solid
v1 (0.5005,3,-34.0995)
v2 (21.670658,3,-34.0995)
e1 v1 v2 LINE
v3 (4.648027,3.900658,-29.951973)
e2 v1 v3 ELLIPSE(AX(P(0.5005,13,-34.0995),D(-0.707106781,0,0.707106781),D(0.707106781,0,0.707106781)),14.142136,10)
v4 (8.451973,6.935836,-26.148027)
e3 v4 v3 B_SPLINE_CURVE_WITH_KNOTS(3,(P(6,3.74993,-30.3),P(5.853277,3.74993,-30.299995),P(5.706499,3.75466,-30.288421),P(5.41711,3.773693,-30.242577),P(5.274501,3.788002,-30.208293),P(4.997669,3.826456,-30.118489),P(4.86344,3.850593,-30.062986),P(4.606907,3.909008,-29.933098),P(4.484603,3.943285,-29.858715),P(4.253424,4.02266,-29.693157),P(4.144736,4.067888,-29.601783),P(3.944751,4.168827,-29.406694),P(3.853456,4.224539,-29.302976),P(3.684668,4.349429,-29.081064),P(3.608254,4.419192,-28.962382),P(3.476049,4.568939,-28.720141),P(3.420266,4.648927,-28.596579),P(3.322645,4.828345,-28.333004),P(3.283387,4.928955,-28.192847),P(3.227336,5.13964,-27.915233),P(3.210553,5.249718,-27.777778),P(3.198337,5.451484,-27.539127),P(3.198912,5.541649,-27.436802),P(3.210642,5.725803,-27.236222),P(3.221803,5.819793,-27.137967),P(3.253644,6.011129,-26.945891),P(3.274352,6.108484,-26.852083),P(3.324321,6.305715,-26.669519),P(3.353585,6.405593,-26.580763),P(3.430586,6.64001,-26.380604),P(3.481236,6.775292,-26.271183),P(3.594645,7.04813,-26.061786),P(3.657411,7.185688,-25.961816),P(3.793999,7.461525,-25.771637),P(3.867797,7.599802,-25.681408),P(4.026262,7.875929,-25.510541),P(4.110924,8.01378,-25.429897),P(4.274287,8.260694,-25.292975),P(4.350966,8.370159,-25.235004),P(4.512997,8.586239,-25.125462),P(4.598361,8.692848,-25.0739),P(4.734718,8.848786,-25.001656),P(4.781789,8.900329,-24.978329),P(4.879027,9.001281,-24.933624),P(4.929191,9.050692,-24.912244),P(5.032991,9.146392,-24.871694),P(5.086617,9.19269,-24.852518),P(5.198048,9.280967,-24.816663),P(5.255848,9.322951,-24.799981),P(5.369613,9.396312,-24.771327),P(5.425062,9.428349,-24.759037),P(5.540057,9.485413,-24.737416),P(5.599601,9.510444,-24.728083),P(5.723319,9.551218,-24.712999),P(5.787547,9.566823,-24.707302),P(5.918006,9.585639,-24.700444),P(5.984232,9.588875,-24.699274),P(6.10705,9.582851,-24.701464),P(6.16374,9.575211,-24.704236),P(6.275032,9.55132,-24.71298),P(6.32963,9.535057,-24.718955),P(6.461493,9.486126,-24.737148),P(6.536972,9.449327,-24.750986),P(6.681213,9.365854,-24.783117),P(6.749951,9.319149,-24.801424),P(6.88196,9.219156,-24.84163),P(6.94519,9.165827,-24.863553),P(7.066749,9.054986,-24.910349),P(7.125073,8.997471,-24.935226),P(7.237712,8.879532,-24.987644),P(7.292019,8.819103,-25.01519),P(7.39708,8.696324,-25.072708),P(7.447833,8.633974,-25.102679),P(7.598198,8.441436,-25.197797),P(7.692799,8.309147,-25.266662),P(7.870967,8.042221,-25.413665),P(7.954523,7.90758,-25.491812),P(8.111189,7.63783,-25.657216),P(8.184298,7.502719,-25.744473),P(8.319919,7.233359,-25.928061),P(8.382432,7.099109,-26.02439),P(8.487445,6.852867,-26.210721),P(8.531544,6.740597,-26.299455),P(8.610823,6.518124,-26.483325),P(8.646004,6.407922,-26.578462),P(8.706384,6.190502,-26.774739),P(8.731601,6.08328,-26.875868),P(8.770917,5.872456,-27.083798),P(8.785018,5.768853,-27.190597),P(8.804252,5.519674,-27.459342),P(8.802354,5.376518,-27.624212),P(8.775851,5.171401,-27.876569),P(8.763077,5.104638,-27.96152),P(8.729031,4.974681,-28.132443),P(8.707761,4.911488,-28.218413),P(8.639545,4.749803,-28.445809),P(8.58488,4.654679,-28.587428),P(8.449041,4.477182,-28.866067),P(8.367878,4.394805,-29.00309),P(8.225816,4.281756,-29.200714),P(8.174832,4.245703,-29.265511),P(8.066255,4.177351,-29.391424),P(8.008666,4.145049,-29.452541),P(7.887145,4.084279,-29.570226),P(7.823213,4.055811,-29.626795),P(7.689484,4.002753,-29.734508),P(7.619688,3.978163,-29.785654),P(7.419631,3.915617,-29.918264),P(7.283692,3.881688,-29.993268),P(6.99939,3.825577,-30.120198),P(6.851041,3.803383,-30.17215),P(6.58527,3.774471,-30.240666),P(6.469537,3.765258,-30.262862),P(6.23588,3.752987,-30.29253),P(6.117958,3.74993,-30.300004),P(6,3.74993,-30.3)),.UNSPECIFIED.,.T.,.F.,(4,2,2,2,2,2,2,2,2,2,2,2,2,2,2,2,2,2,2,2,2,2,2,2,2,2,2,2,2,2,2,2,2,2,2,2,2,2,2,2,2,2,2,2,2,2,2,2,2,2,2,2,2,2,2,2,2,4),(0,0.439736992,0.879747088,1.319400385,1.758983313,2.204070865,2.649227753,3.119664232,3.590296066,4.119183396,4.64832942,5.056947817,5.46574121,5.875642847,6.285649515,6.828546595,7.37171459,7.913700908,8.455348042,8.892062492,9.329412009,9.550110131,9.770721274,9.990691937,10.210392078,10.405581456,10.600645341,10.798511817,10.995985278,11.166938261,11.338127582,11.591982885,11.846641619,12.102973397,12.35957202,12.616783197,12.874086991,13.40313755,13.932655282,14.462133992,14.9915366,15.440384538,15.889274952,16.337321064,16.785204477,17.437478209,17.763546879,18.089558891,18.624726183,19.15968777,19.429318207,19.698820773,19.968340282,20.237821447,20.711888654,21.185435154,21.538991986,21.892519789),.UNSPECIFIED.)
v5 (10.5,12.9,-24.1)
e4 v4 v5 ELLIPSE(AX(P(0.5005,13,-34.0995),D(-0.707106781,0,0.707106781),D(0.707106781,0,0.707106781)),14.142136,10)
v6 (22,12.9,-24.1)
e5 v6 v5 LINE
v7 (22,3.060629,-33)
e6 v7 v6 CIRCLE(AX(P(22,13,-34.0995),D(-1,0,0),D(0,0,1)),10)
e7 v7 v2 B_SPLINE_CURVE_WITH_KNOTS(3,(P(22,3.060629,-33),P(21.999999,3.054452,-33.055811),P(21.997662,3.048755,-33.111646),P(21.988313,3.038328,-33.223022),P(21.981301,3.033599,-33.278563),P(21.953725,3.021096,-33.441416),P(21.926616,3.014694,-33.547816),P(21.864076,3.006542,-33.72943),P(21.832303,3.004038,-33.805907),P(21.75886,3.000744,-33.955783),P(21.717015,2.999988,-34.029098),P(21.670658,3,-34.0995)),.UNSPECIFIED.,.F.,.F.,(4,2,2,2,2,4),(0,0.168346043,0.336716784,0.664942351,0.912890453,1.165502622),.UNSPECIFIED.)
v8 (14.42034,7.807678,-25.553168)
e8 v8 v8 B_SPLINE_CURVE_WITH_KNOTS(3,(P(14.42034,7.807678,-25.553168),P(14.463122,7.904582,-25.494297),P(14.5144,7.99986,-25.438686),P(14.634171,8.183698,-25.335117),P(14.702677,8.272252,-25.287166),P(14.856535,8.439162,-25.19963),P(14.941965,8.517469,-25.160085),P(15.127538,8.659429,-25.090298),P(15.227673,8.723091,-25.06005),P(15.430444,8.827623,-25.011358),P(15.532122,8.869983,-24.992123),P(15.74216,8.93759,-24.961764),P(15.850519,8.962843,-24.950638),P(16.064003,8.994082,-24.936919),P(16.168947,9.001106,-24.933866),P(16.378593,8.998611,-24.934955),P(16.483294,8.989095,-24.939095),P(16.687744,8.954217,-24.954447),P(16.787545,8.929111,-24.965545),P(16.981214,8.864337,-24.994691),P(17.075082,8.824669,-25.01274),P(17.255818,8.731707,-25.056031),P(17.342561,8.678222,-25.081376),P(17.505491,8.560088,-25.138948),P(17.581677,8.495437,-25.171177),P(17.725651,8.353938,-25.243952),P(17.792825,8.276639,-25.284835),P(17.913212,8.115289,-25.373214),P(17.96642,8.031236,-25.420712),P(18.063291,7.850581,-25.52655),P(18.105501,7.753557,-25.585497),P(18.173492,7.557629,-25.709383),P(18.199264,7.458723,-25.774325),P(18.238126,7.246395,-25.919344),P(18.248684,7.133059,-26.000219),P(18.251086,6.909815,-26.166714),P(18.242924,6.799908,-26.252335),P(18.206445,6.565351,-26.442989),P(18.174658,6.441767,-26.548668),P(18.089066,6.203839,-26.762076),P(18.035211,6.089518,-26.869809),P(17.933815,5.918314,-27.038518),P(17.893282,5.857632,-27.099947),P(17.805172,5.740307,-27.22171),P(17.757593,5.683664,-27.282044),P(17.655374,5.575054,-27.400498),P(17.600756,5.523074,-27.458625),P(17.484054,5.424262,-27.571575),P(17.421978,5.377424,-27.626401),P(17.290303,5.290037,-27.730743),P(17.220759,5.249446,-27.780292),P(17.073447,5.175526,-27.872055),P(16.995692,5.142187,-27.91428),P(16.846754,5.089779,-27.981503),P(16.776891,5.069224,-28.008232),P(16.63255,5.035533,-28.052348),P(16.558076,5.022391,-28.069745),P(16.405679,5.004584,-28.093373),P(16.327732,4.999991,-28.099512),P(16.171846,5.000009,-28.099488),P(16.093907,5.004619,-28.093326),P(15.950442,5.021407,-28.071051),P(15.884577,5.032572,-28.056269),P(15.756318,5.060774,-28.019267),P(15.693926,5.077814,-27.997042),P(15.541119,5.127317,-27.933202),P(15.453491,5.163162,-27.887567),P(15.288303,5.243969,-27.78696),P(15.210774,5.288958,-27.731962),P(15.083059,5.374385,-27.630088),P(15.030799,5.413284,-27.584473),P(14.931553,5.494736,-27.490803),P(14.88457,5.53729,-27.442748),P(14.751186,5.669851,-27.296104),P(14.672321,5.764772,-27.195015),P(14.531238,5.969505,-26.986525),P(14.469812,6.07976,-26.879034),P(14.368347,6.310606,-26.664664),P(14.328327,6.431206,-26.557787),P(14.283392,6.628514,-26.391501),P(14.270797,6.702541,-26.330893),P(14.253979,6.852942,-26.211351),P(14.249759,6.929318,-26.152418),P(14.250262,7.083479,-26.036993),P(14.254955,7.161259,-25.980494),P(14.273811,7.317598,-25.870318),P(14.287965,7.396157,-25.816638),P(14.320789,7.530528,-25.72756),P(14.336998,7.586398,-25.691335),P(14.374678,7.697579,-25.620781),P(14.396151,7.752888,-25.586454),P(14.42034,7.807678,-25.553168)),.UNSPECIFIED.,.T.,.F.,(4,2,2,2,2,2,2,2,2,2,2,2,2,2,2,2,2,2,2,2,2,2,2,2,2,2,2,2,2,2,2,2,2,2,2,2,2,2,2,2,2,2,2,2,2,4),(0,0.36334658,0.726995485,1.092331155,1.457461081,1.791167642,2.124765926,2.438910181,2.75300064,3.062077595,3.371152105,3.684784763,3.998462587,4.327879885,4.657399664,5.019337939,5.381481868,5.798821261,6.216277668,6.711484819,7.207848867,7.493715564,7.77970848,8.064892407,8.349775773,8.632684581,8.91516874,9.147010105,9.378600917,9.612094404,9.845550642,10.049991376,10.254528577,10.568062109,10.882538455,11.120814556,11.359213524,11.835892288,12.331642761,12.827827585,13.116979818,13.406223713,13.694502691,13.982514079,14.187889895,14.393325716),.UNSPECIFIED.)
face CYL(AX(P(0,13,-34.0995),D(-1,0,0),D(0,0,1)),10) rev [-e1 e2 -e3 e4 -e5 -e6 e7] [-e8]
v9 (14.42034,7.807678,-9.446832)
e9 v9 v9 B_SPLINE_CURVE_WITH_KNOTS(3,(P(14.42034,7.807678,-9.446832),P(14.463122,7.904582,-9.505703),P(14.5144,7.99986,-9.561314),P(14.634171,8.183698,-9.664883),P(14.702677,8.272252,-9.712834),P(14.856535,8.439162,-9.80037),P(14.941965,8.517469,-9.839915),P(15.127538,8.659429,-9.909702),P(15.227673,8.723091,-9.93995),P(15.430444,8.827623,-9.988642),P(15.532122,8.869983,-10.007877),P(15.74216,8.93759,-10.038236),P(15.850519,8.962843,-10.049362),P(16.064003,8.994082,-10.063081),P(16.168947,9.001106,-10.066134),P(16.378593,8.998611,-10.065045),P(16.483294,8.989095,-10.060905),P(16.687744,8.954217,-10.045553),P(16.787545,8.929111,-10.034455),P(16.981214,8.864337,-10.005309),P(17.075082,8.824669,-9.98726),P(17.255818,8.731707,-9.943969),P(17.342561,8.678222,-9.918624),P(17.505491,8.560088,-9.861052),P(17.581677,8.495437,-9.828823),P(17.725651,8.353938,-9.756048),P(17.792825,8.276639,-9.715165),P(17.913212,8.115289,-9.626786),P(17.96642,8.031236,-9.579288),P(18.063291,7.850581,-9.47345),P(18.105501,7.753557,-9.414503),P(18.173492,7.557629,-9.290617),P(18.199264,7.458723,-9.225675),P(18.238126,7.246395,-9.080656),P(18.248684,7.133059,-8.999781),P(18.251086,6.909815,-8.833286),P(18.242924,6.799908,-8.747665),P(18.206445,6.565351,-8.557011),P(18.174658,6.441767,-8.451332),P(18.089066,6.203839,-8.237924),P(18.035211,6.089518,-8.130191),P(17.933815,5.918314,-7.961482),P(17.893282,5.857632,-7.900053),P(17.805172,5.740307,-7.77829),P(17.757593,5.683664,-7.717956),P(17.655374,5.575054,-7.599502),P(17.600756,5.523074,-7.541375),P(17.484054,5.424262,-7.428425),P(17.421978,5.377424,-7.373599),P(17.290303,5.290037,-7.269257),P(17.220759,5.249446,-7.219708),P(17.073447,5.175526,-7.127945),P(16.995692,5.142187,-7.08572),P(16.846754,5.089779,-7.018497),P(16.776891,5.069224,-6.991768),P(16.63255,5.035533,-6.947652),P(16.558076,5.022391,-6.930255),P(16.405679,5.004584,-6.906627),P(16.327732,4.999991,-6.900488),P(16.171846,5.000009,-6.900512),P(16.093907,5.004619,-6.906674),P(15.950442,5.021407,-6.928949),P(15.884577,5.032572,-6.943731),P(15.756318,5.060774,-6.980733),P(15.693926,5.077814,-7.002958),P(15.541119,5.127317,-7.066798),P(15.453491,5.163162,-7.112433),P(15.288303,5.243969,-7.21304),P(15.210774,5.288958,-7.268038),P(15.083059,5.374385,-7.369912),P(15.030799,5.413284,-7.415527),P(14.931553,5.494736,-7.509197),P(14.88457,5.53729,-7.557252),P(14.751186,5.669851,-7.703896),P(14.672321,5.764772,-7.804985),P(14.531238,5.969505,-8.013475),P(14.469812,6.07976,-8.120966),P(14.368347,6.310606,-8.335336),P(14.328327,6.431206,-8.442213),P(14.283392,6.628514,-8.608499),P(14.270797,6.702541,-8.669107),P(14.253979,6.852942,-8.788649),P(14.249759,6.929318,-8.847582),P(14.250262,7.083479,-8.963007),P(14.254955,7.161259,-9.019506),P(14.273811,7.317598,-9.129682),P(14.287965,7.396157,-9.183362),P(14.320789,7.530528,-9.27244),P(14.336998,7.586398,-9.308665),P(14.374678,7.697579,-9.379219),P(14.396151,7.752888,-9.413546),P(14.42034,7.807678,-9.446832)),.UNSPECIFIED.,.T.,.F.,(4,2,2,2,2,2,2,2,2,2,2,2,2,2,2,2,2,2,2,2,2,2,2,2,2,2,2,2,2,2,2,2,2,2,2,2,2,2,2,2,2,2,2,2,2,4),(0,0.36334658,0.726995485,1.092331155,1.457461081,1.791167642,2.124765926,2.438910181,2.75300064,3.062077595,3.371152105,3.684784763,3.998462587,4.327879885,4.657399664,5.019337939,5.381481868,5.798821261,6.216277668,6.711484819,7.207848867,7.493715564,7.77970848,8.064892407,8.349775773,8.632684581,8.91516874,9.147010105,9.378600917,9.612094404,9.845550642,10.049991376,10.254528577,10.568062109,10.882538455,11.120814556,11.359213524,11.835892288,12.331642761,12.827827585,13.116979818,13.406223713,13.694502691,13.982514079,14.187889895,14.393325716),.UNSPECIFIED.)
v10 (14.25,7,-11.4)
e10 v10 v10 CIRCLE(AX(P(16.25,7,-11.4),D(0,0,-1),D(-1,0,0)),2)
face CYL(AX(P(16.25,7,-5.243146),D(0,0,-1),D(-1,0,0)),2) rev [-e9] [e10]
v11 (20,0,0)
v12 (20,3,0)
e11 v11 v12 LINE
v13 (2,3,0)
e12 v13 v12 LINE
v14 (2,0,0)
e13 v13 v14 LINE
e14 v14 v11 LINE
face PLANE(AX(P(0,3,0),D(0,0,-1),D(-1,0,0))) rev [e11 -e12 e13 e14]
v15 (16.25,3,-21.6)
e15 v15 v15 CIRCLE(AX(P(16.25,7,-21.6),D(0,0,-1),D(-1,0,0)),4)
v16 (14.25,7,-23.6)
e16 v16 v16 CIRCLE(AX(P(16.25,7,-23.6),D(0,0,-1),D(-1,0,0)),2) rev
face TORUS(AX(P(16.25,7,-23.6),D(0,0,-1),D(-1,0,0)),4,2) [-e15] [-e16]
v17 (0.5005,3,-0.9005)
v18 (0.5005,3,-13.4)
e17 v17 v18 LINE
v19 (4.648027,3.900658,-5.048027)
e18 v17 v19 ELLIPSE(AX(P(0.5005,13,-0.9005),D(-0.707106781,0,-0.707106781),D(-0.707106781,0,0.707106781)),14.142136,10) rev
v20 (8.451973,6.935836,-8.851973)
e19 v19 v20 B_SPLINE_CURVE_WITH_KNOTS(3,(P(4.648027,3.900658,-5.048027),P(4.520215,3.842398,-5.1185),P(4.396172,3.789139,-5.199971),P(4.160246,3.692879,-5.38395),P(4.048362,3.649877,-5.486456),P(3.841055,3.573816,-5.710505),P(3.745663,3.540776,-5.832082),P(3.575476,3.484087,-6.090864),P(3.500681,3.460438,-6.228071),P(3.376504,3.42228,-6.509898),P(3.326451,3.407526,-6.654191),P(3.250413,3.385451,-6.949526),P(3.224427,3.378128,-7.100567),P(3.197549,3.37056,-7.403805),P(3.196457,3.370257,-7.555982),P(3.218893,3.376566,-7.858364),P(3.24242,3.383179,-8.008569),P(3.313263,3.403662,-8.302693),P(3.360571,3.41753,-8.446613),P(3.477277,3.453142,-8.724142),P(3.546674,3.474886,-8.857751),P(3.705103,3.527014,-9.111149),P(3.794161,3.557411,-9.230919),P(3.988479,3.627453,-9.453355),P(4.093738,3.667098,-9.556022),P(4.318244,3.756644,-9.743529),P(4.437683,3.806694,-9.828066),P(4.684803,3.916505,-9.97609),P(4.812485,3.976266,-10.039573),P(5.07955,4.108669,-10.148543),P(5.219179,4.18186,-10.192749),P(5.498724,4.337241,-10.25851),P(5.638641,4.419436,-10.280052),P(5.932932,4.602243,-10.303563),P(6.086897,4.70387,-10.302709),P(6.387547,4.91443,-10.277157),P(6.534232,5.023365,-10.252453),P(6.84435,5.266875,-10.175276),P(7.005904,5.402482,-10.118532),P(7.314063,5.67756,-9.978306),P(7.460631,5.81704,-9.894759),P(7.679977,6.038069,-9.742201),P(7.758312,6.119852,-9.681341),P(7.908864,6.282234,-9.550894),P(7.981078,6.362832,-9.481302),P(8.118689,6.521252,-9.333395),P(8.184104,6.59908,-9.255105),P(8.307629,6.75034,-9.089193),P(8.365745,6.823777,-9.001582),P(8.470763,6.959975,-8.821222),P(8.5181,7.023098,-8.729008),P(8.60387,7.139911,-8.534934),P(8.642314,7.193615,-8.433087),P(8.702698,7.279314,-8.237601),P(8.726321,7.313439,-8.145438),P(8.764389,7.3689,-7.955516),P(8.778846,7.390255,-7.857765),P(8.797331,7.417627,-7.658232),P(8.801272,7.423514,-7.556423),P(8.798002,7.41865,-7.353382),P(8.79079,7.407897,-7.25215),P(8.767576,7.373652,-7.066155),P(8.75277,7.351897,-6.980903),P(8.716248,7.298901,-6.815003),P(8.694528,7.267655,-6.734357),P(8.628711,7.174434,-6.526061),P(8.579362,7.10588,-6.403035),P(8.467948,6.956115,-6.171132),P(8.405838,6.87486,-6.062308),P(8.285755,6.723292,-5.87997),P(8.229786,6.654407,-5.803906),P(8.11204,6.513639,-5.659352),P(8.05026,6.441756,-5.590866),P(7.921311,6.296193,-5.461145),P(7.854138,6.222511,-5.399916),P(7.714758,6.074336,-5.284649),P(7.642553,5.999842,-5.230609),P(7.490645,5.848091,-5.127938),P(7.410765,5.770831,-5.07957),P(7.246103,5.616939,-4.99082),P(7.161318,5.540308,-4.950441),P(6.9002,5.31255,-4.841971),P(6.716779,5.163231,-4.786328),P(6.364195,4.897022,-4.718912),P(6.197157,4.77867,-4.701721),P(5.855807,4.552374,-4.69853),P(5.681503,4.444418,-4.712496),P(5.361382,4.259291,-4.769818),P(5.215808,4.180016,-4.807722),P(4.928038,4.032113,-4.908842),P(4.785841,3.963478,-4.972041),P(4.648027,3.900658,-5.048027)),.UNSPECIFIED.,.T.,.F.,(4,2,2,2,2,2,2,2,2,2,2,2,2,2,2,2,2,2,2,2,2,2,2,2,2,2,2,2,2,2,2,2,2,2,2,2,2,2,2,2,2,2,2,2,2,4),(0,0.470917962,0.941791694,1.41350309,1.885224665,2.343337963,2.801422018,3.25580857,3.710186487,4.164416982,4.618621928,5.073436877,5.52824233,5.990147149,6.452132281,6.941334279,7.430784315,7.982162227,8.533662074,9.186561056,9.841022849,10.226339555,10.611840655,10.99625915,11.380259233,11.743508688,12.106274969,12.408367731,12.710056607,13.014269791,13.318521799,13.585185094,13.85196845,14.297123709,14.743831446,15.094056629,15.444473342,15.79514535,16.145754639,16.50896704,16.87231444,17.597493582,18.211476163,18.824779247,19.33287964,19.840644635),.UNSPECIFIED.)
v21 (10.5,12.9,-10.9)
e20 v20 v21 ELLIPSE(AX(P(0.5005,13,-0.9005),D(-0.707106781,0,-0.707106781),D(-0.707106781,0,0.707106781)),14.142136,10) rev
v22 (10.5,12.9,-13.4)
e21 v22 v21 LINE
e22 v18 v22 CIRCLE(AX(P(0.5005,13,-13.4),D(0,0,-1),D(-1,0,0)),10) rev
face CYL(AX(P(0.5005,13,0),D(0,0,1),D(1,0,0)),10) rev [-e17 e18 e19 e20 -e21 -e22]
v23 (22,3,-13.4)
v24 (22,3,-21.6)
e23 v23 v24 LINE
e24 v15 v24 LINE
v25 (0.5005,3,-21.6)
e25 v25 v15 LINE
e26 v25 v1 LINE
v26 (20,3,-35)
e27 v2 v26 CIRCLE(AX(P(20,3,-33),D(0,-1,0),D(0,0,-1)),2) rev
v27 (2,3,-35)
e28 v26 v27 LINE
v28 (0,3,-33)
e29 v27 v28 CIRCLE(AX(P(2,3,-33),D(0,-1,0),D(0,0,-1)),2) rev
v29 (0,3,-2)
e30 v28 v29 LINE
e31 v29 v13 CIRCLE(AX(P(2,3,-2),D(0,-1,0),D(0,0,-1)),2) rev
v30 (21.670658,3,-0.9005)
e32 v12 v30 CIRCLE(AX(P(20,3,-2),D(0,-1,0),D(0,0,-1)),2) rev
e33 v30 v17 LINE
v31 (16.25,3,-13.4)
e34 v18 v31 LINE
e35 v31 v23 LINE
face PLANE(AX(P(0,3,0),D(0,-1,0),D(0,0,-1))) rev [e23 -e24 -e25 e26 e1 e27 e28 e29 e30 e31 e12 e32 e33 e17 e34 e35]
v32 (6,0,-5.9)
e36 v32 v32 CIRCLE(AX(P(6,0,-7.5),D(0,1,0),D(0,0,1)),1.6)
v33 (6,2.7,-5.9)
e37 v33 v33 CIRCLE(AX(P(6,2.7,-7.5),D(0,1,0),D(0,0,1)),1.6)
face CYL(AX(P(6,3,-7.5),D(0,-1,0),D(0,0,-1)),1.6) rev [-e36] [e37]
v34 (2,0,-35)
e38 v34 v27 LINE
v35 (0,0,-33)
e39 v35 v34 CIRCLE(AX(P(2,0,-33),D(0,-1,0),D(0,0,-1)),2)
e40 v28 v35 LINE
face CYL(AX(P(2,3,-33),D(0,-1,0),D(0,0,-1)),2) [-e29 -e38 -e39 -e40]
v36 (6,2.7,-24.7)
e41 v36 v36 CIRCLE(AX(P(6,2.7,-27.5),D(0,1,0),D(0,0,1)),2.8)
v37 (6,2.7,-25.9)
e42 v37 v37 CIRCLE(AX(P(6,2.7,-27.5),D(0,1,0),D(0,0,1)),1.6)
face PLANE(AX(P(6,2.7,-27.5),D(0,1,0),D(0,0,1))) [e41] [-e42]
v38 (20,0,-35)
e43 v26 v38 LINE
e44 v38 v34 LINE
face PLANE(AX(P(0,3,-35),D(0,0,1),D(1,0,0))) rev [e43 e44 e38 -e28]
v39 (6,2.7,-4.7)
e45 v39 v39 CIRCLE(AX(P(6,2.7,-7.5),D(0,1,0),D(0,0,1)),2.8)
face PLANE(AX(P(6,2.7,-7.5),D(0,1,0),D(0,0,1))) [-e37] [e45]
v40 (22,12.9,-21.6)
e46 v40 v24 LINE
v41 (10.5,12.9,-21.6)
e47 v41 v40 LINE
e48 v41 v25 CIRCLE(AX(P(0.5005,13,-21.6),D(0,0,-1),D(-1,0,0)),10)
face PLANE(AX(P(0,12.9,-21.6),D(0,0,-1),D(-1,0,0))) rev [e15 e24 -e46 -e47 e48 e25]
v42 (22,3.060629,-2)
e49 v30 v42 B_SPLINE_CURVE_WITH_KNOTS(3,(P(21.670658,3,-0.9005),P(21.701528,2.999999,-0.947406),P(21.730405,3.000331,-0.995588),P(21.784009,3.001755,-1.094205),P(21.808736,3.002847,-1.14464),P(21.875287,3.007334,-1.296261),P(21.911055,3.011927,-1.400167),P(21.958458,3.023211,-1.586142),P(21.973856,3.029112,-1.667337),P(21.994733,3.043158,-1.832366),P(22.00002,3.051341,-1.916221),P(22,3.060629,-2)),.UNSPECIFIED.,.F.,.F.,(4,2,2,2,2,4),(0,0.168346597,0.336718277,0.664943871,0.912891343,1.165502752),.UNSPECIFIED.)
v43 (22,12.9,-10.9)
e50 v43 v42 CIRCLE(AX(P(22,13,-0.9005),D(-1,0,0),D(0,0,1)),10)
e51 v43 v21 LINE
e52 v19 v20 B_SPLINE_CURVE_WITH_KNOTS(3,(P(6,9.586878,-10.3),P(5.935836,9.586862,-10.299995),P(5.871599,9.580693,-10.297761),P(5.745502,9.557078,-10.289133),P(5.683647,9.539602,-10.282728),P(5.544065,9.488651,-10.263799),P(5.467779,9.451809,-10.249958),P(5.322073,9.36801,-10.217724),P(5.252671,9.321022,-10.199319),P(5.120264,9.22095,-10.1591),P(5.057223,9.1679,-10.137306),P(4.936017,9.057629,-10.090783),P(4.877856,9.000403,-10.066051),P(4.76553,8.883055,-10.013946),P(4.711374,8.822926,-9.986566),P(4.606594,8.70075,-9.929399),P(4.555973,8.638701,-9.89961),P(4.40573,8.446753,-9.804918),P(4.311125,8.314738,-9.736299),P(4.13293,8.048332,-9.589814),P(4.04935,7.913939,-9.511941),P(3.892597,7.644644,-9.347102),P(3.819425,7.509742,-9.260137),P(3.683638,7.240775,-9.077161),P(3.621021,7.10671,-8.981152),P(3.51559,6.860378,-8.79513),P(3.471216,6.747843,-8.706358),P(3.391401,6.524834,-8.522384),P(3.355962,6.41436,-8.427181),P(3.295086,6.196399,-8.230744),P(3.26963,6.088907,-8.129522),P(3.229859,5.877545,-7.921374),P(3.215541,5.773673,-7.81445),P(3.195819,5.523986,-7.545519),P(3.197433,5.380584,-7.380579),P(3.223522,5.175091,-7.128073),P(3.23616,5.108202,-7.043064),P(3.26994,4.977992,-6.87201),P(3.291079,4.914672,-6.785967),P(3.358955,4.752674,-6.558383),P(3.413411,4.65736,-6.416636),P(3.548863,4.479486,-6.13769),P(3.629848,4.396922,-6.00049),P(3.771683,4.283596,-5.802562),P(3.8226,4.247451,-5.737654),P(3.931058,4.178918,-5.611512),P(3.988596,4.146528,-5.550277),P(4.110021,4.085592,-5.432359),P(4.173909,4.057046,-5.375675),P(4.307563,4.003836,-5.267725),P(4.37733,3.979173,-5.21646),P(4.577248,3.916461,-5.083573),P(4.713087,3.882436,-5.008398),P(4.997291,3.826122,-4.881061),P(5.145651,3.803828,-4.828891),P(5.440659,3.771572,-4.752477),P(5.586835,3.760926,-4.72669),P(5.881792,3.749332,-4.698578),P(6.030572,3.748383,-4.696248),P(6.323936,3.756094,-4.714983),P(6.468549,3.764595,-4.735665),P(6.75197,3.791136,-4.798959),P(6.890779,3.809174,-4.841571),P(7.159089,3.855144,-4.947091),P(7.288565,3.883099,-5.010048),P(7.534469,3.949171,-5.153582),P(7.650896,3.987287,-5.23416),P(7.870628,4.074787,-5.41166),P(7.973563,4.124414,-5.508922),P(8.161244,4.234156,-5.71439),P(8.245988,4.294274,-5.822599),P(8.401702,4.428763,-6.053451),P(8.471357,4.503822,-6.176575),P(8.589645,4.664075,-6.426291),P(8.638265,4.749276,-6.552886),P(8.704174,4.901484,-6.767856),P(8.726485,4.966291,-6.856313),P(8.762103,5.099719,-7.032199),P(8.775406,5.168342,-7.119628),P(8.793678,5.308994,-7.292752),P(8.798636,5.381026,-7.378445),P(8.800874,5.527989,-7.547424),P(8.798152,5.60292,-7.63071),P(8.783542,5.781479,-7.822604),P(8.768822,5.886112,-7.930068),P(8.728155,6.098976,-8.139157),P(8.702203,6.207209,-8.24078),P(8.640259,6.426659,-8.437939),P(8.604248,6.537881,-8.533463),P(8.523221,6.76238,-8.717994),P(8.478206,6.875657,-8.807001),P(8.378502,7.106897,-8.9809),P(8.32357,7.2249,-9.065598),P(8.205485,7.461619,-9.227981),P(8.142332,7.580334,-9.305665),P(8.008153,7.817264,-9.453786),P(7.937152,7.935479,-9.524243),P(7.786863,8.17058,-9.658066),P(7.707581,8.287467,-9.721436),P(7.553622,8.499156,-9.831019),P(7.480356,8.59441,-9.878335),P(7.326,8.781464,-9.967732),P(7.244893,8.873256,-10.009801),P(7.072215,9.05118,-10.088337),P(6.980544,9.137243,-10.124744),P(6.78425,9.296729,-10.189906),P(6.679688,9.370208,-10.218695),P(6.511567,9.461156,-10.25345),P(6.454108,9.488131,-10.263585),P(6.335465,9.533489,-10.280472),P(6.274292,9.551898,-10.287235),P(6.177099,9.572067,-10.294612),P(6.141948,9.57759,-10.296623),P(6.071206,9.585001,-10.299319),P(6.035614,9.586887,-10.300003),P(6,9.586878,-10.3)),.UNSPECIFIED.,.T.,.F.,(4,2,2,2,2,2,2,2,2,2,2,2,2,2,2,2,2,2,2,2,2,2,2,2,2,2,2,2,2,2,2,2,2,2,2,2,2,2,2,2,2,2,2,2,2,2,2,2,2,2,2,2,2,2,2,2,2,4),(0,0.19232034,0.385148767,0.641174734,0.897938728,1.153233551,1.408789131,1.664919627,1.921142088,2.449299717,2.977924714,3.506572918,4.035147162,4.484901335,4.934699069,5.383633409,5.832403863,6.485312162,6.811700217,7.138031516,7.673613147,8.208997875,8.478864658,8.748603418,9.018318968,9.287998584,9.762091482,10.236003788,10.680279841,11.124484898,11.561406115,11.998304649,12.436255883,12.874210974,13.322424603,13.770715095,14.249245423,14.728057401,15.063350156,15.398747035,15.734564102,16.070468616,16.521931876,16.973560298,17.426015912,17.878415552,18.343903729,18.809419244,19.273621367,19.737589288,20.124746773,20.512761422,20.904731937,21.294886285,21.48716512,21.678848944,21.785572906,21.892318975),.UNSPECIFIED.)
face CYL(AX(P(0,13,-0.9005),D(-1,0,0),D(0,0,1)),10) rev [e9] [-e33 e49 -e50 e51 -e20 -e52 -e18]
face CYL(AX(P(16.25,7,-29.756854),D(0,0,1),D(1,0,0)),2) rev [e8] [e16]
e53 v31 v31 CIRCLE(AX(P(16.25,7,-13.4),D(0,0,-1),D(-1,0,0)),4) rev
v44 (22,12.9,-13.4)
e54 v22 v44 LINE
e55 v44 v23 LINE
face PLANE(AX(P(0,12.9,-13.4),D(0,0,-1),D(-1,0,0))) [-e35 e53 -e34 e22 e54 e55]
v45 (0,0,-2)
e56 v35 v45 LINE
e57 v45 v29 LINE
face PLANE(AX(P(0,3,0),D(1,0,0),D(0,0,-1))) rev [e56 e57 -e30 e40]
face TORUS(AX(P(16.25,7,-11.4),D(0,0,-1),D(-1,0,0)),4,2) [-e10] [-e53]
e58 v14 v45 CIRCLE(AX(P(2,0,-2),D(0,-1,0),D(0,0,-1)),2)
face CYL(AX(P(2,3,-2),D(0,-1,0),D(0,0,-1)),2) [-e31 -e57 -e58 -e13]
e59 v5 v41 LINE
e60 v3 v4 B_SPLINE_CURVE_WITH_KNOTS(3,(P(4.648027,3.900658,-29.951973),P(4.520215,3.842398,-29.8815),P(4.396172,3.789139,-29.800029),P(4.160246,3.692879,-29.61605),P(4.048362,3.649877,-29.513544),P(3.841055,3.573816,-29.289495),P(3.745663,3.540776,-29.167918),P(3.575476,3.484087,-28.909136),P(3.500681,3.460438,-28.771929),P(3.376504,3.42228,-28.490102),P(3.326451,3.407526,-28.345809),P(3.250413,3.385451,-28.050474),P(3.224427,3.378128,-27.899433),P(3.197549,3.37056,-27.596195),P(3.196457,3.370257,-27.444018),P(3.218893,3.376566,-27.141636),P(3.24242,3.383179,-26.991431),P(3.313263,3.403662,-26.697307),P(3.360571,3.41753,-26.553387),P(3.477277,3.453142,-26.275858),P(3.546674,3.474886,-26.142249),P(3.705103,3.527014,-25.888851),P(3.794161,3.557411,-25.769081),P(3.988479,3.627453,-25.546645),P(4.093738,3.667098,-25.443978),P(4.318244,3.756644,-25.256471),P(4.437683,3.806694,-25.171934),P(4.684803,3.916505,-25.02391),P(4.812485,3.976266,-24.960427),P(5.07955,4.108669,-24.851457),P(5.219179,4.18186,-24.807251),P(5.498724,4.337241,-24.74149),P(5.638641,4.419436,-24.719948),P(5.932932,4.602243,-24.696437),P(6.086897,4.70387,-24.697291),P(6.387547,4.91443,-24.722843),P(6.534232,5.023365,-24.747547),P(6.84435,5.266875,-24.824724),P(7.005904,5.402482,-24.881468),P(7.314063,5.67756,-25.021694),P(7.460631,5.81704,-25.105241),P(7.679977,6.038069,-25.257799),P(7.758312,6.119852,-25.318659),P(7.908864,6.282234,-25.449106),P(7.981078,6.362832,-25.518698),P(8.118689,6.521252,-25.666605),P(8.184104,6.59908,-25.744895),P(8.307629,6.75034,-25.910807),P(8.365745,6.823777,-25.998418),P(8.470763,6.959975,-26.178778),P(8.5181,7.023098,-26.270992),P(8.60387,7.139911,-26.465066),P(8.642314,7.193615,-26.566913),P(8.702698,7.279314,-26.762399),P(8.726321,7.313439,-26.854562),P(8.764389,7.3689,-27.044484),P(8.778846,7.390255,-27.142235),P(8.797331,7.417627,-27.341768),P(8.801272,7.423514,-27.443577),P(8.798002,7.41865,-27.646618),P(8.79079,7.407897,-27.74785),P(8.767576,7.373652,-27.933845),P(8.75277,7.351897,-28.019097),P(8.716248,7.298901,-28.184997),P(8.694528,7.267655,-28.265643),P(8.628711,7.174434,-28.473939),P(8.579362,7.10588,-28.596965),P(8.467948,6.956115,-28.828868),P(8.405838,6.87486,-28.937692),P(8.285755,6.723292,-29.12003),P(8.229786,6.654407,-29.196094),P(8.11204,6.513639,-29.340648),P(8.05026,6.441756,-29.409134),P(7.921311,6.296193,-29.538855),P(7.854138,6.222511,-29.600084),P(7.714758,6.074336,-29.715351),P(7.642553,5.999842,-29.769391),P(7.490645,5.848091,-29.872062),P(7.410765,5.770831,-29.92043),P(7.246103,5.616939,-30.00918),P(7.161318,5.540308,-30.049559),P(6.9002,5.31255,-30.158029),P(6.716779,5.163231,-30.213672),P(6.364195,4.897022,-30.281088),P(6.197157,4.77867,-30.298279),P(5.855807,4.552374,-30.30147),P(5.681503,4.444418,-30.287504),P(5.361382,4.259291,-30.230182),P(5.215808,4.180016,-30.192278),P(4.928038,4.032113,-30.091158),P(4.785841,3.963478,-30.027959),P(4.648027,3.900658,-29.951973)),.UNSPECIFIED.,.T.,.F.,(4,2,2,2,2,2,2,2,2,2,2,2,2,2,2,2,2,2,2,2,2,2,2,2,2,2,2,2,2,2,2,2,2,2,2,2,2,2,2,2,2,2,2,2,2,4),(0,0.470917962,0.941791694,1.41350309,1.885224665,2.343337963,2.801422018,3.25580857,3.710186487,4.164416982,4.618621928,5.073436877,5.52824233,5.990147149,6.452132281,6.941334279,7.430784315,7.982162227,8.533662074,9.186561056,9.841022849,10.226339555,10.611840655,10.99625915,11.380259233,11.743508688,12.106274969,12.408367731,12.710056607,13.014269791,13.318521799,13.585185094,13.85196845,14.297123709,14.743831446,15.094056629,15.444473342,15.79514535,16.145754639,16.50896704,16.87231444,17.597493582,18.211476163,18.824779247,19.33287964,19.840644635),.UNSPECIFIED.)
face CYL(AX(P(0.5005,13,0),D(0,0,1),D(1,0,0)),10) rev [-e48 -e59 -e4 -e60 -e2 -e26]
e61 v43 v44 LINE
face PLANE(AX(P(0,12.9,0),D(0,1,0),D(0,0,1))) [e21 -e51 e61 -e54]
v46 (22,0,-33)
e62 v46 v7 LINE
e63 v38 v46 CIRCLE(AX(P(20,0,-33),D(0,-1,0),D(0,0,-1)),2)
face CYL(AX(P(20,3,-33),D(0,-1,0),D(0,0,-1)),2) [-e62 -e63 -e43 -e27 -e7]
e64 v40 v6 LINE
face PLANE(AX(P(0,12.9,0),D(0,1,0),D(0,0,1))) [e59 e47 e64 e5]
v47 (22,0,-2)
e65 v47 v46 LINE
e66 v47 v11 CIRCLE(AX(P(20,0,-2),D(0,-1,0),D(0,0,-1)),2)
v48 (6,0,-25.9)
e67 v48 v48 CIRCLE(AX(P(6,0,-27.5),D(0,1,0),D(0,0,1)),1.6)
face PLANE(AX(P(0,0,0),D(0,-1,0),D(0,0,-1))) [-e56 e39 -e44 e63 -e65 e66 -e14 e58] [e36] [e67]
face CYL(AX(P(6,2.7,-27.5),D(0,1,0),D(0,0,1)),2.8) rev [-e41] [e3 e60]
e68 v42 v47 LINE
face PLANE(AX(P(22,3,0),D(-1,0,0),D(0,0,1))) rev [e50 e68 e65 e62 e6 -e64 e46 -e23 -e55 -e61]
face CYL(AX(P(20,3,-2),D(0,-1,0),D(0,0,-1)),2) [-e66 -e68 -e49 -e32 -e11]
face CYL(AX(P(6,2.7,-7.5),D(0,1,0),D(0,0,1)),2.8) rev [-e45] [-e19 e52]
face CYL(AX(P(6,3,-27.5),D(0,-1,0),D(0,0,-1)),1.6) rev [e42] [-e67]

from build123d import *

# Parameters (mm, degrees)
CROQUIS1_W              = 22
CROQUIS1_H              = 35
CROQUIS1_R              = 1.6
SALIENTE_EXTRUIR1_DEPTH = 3
CROQUIS2_W              = 11.5
CROQUIS2_H              = 2.5
SALIENTE_EXTRUIR2_DEPTH = 9.9
CROQUIS4_R              = 2
CORTAR_EXTRUIR1_DEPTH   = 2.5
CORTAR_EXTRUIR2_START   = -2.5
CROQUIS5_R              = 2
CORTAR_EXTRUIR2_DEPTH   = 2.5
CROQUIS6_R              = 2.8
CORTAR_EXTRUIR3_DEPTH   = 0.3
REDONDEO1_R             = 2
REDONDEO2_R             = 10
REDONDEO4_R             = 2


# Some blends are built 0.0001 mm under size
with BuildPart() as part:
    # Croquis1 → Saliente-Extruir1 (new body)
    with BuildSketch(Plane(origin=(0, 0, 0), x_dir=(1, 0, 0), z_dir=(0, 1, 0))):
        with Locations((11, 17.5)):
            Rectangle(CROQUIS1_W, CROQUIS1_H)
        with Locations(Location((6, 27.5, 0), (0, 0, 270))):
            Circle(CROQUIS1_R, mode=Mode.SUBTRACT)
        with Locations(Location((6, 7.5, 0), (0, 0, 270))):
            Circle(CROQUIS1_R, mode=Mode.SUBTRACT)
    extrude(amount=SALIENTE_EXTRUIR1_DEPTH)

    # Croquis2 → Saliente-Extruir2 (add)
    with BuildSketch(Plane(origin=(0, 3, 0), x_dir=(1, 0, 0), z_dir=(0, 1, 0))):
        with Locations((16.25, 22.85)):
            Rectangle(CROQUIS2_W, CROQUIS2_H)
        with Locations((16.25, 12.15)):
            Rectangle(CROQUIS2_W, CROQUIS2_H)
    extrude(amount=SALIENTE_EXTRUIR2_DEPTH)

    # Croquis4 → Cortar-Extruir1 (cut)
    with BuildSketch(Plane.XY.offset(-21.6)):
        with Locations((16.25, 7)):
            Circle(CROQUIS4_R)
    extrude(amount=-CORTAR_EXTRUIR1_DEPTH, mode=Mode.SUBTRACT)

    # Croquis5 → Cortar-Extruir2 (cut)
    with BuildSketch(Plane(origin=(0, 0, -13.4), x_dir=(-1, 0, 0), z_dir=(0, 0, -1)).offset(CORTAR_EXTRUIR2_START)):
        with Locations(Location((-16.25, 7, 0), (0, 0, 180))):
            Circle(CROQUIS5_R)
    extrude(amount=CORTAR_EXTRUIR2_DEPTH, mode=Mode.SUBTRACT)

    # Croquis6 → Cortar-Extruir3 (cut)
    with BuildSketch(Plane(origin=(0, 3, 0), x_dir=(1, 0, 0), z_dir=(0, 1, 0))):
        with Locations(Location((6, 7.5, 0), (0, 0, 270))):
            Circle(CROQUIS6_R)
        with Locations(Location((6, 27.5, 0), (0, 0, 270))):
            Circle(CROQUIS6_R)
    extrude(amount=-CORTAR_EXTRUIR3_DEPTH, mode=Mode.SUBTRACT)

    # Redondeo1
    redondeo1_edges = [part.edges().sort_by_distance(p)[0] for p in [
        (14.25, 7, -21.6),
        (14.25, 7, -13.4),
    ]]
    fillet(redondeo1_edges, radius=REDONDEO1_R - 0.0001)  # a hair under: the kernel refuses the full size

    # Redondeo2
    # the kernel refuses this fillet: 10 mm, written as the material it adds along each edge
    with BuildSketch(Plane(origin=(22, 3, -24.1), x_dir=(0, 0, -1), z_dir=(-1, 0, 0))) as redondeo2_piece_1_section:
        with BuildLine():
            CenterArc((REDONDEO2_R, -REDONDEO2_R), REDONDEO2_R, 90, 90)
            Line((0, -REDONDEO2_R), (0, 0))
            Line((0, 0), (REDONDEO2_R, 0))
        make_face()
    redondeo2_piece_1 = extrude(amount=11.5, mode=Mode.PRIVATE)
    redondeo2_piece_1 = split(redondeo2_piece_1, bisect_by=Plane(origin=(12.416666667, 12.9, -31.511409781), z_dir=(0, -1, 0)), keep=Keep.TOP, mode=Mode.PRIVATE)
    redondeo2_piece_1 = redondeo2_piece_1 - Plane(origin=(16.25, 7, -31.511409781), x_dir=(1, 0, 0), z_dir=(0, 0, 1)) * Cylinder(2, 63, mode=Mode.PRIVATE)
    add(redondeo2_piece_1)
    with BuildSketch(Plane(origin=(10.5, 3, -24.1), x_dir=(-1, 0, 0), z_dir=(0, 0, 1))) as redondeo2_piece_2_section:
        with BuildLine():
            CenterArc((REDONDEO2_R, -REDONDEO2_R), REDONDEO2_R, 90, 90)
            Line((0, -REDONDEO2_R), (0, 0))
            Line((0, 0), (REDONDEO2_R, 0))
        make_face()
    redondeo2_piece_2 = extrude(amount=2.5, mode=Mode.PRIVATE)
    redondeo2_piece_2 = split(redondeo2_piece_2, bisect_by=Plane(origin=(8.234191854, 12.9, -22.85), z_dir=(0, -1, 0)), keep=Keep.TOP, mode=Mode.PRIVATE)
    add(redondeo2_piece_2)
    with BuildSketch(Plane(origin=(10.5, 3, -24.1), x_dir=(-1, 0, 0), z_dir=(0, 0, 1))) as redondeo2_piece_3_section:
        with BuildLine():
            CenterArc((REDONDEO2_R, -REDONDEO2_R), REDONDEO2_R, 90, 90)
            Line((0, -REDONDEO2_R), (0, 0))
            Line((0, 0), (REDONDEO2_R, 0))
        make_face()
    redondeo2_piece_3 = extrude(amount=27.5, mode=Mode.PRIVATE)
    redondeo2_piece_3 = split(redondeo2_piece_3, bisect_by=Plane(origin=(8.234191854, 5.257913166, -13.4), z_dir=(0, 0, 1)), keep=Keep.TOP, mode=Mode.PRIVATE)
    redondeo2_piece_3 = split(redondeo2_piece_3, bisect_by=Plane(origin=(8.234191854, 12.9, -12.15), z_dir=(0, -1, 0)), keep=Keep.TOP, mode=Mode.PRIVATE)
    redondeo2_piece_3 = split(redondeo2_piece_3, bisect_by=Plane(origin=(8.234191854, 5.257913166, -10.9), z_dir=(0, 0, -1)), keep=Keep.TOP, mode=Mode.PRIVATE)
    add(redondeo2_piece_3)
    with BuildSketch(Plane(origin=(10.5, 3, -38.4), x_dir=(-1, 0, 0), z_dir=(0, 0, 1))) as redondeo2_piece_4_section:
        with BuildLine():
            CenterArc((REDONDEO2_R, -REDONDEO2_R), REDONDEO2_R, 90, 90)
            Line((0, -REDONDEO2_R), (0, 0))
            Line((0, 0), (REDONDEO2_R, 0))
        make_face()
    redondeo2_piece_4 = extrude(amount=27.5, mode=Mode.PRIVATE)
    redondeo2_piece_4 = split(redondeo2_piece_4, bisect_by=Plane(origin=(8.234191854, 12.9, -22.85), z_dir=(0, -1, 0)), keep=Keep.TOP, mode=Mode.PRIVATE)
    redondeo2_piece_4 = split(redondeo2_piece_4, bisect_by=Plane(origin=(8.234191854, 5.257913166, -21.6), z_dir=(0, 0, -1)), keep=Keep.TOP, mode=Mode.PRIVATE)
    redondeo2_piece_4 = split(redondeo2_piece_4, bisect_by=Plane(origin=(8.234191854, 5.257913166, -24.1), z_dir=(0, 0, 1)), keep=Keep.TOP, mode=Mode.PRIVATE)
    add(redondeo2_piece_4)
    with BuildSketch(Plane(origin=(10.5, 3, -13.4), x_dir=(-1, 0, 0), z_dir=(0, 0, 1))) as redondeo2_piece_5_section:
        with BuildLine():
            CenterArc((REDONDEO2_R, -REDONDEO2_R), REDONDEO2_R, 90, 90)
            Line((0, -REDONDEO2_R), (0, 0))
            Line((0, 0), (REDONDEO2_R, 0))
        make_face()
    redondeo2_piece_5 = extrude(amount=2.5, mode=Mode.PRIVATE)
    redondeo2_piece_5 = split(redondeo2_piece_5, bisect_by=Plane(origin=(8.234191854, 12.9, -12.15), z_dir=(0, -1, 0)), keep=Keep.TOP, mode=Mode.PRIVATE)
    add(redondeo2_piece_5)
    with BuildSketch(Plane(origin=(10.5, 3, -10.9), x_dir=(0, 0, 1), z_dir=(1, 0, 0))) as redondeo2_piece_6_section:
        with BuildLine():
            CenterArc((REDONDEO2_R, -REDONDEO2_R), REDONDEO2_R, 90, 90)
            Line((0, -REDONDEO2_R), (0, 0))
            Line((0, 0), (REDONDEO2_R, 0))
        make_face()
    redondeo2_piece_6 = extrude(amount=11.5, mode=Mode.PRIVATE)
    redondeo2_piece_6 = split(redondeo2_piece_6, bisect_by=Plane(origin=(20.083333333, 12.9, -3.488590219), z_dir=(0, -1, 0)), keep=Keep.TOP, mode=Mode.PRIVATE)
    redondeo2_piece_6 = redondeo2_piece_6 - Plane(origin=(16.25, 7, -3.488590219), x_dir=(1, 0, 0), z_dir=(0, 0, 1)) * Cylinder(2, 63, mode=Mode.PRIVATE)
    add(redondeo2_piece_6)
    with BuildSketch(Plane(origin=(22, 3, -24.1), x_dir=(0, 0, -1), z_dir=(-1, 0, 0))) as redondeo2_piece_7a_section:
        with BuildLine():
            CenterArc((REDONDEO2_R, -REDONDEO2_R), REDONDEO2_R, 90, 90)
            Line((0, -REDONDEO2_R), (0, 0))
            Line((0, 0), (REDONDEO2_R, 0))
        make_face()
    redondeo2_piece_7a = extrude(amount=36.5, mode=Mode.PRIVATE)
    redondeo2_piece_7a = split(redondeo2_piece_7a, bisect_by=Plane(origin=(0, 3.280401031, -31.512996252), z_dir=(1, 0, 0)), keep=Keep.TOP, mode=Mode.PRIVATE)
    redondeo2_piece_7a = redondeo2_piece_7a - Plane(origin=(6, 3.280401031, -27.5), x_dir=(0, 0, 1), z_dir=(0, 1, 0)) * Cylinder(2.8, 113, mode=Mode.PRIVATE)
    redondeo2_piece_7a = split(redondeo2_piece_7a, bisect_by=Plane(origin=(1.75, 12.9, -31.512996252), z_dir=(0, -1, 0)), keep=Keep.TOP, mode=Mode.PRIVATE)
    redondeo2_piece_7a = split(redondeo2_piece_7a, bisect_by=Plane(origin=(10.5, 3.280401031, -31.512996252), z_dir=(-1, 0, 0)), keep=Keep.TOP, mode=Mode.PRIVATE)
    with BuildSketch(Plane(origin=(10.5, 3, -49.1), x_dir=(-1, 0, 0), z_dir=(0, 0, 1))) as redondeo2_piece_7b_section:
        with BuildLine():
            CenterArc((REDONDEO2_R, -REDONDEO2_R), REDONDEO2_R, 90, 90)
            Line((0, -REDONDEO2_R), (0, 0))
            Line((0, 0), (REDONDEO2_R, 0))
        make_face()
    redondeo2_piece_7b = extrude(amount=27.5, mode=Mode.PRIVATE)
    redondeo2_piece_7b = split(redondeo2_piece_7b, bisect_by=Plane(origin=(8.577465214, 5.522304582, -35), z_dir=(0, 0, 1)), keep=Keep.TOP, mode=Mode.PRIVATE)
    redondeo2_piece_7b = redondeo2_piece_7b - Plane(origin=(6, 5.522304582, -27.5), x_dir=(0, 0, 1), z_dir=(0, 1, 0)) * Cylinder(2.8, 95, mode=Mode.PRIVATE)
    redondeo2_piece_7b = split(redondeo2_piece_7b, bisect_by=Plane(origin=(8.577465214, 12.9, -29.998804987), z_dir=(0, -1, 0)), keep=Keep.TOP, mode=Mode.PRIVATE)
    redondeo2_piece_7b = split(redondeo2_piece_7b, bisect_by=Plane(origin=(8.577465214, 5.522304582, -24.1), z_dir=(0, 0, -1)), keep=Keep.TOP, mode=Mode.PRIVATE)
    redondeo2_piece_7 = redondeo2_piece_7a & redondeo2_piece_7b
    add(redondeo2_piece_7)
    with BuildSketch(Plane(origin=(-14.5, 3, -10.9), x_dir=(0, 0, 1), z_dir=(1, 0, 0))) as redondeo2_piece_8a_section:
        with BuildLine():
            CenterArc((REDONDEO2_R, -REDONDEO2_R), REDONDEO2_R, 90, 90)
            Line((0, -REDONDEO2_R), (0, 0))
            Line((0, 0), (REDONDEO2_R, 0))
        make_face()
    redondeo2_piece_8a = extrude(amount=36.5, mode=Mode.PRIVATE)
    redondeo2_piece_8a = split(redondeo2_piece_8a, bisect_by=Plane(origin=(0, 3.280397801, -3.487004608), z_dir=(1, 0, 0)), keep=Keep.TOP, mode=Mode.PRIVATE)
    redondeo2_piece_8a = redondeo2_piece_8a - Plane(origin=(6, 3.280397801, -7.5), x_dir=(0, 0, 1), z_dir=(0, 1, 0)) * Cylinder(2.8, 113, mode=Mode.PRIVATE)
    redondeo2_piece_8a = split(redondeo2_piece_8a, bisect_by=Plane(origin=(8.75, 12.9, -3.487004608), z_dir=(0, -1, 0)), keep=Keep.TOP, mode=Mode.PRIVATE)
    redondeo2_piece_8a = split(redondeo2_piece_8a, bisect_by=Plane(origin=(10.5, 3.280397801, -3.487004608), z_dir=(-1, 0, 0)), keep=Keep.TOP, mode=Mode.PRIVATE)
    with BuildSketch(Plane(origin=(10.5, 3, -13.4), x_dir=(-1, 0, 0), z_dir=(0, 0, 1))) as redondeo2_piece_8b_section:
        with BuildLine():
            CenterArc((REDONDEO2_R, -REDONDEO2_R), REDONDEO2_R, 90, 90)
            Line((0, -REDONDEO2_R), (0, 0))
            Line((0, 0), (REDONDEO2_R, 0))
        make_face()
    redondeo2_piece_8b = extrude(amount=27.5, mode=Mode.PRIVATE)
    redondeo2_piece_8b = split(redondeo2_piece_8b, bisect_by=Plane(origin=(8.577464667, 5.522304516, 0), z_dir=(0, 0, -1)), keep=Keep.TOP, mode=Mode.PRIVATE)
    redondeo2_piece_8b = redondeo2_piece_8b - Plane(origin=(6, 5.522304516, -7.5), x_dir=(0, 0, 1), z_dir=(0, 1, 0)) * Cylinder(2.8, 95, mode=Mode.PRIVATE)
    redondeo2_piece_8b = split(redondeo2_piece_8b, bisect_by=Plane(origin=(8.577464667, 12.9, -5.00119928), z_dir=(0, -1, 0)), keep=Keep.TOP, mode=Mode.PRIVATE)
    redondeo2_piece_8b = split(redondeo2_piece_8b, bisect_by=Plane(origin=(8.577464667, 5.522304516, -10.9), z_dir=(0, 0, 1)), keep=Keep.TOP, mode=Mode.PRIVATE)
    redondeo2_piece_8 = redondeo2_piece_8a & redondeo2_piece_8b
    add(redondeo2_piece_8)

    # Redondeo4
    redondeo4_edges = [part.edges().sort_by_distance(p)[0] for p in [
        (0, 1.5, -35),
        (0, 1.5, 0),
        (22, 1.5, 0),
        (22, 1.5, -35),
    ]]
    fillet(redondeo4_edges, radius=REDONDEO4_R)


solid = part.part
